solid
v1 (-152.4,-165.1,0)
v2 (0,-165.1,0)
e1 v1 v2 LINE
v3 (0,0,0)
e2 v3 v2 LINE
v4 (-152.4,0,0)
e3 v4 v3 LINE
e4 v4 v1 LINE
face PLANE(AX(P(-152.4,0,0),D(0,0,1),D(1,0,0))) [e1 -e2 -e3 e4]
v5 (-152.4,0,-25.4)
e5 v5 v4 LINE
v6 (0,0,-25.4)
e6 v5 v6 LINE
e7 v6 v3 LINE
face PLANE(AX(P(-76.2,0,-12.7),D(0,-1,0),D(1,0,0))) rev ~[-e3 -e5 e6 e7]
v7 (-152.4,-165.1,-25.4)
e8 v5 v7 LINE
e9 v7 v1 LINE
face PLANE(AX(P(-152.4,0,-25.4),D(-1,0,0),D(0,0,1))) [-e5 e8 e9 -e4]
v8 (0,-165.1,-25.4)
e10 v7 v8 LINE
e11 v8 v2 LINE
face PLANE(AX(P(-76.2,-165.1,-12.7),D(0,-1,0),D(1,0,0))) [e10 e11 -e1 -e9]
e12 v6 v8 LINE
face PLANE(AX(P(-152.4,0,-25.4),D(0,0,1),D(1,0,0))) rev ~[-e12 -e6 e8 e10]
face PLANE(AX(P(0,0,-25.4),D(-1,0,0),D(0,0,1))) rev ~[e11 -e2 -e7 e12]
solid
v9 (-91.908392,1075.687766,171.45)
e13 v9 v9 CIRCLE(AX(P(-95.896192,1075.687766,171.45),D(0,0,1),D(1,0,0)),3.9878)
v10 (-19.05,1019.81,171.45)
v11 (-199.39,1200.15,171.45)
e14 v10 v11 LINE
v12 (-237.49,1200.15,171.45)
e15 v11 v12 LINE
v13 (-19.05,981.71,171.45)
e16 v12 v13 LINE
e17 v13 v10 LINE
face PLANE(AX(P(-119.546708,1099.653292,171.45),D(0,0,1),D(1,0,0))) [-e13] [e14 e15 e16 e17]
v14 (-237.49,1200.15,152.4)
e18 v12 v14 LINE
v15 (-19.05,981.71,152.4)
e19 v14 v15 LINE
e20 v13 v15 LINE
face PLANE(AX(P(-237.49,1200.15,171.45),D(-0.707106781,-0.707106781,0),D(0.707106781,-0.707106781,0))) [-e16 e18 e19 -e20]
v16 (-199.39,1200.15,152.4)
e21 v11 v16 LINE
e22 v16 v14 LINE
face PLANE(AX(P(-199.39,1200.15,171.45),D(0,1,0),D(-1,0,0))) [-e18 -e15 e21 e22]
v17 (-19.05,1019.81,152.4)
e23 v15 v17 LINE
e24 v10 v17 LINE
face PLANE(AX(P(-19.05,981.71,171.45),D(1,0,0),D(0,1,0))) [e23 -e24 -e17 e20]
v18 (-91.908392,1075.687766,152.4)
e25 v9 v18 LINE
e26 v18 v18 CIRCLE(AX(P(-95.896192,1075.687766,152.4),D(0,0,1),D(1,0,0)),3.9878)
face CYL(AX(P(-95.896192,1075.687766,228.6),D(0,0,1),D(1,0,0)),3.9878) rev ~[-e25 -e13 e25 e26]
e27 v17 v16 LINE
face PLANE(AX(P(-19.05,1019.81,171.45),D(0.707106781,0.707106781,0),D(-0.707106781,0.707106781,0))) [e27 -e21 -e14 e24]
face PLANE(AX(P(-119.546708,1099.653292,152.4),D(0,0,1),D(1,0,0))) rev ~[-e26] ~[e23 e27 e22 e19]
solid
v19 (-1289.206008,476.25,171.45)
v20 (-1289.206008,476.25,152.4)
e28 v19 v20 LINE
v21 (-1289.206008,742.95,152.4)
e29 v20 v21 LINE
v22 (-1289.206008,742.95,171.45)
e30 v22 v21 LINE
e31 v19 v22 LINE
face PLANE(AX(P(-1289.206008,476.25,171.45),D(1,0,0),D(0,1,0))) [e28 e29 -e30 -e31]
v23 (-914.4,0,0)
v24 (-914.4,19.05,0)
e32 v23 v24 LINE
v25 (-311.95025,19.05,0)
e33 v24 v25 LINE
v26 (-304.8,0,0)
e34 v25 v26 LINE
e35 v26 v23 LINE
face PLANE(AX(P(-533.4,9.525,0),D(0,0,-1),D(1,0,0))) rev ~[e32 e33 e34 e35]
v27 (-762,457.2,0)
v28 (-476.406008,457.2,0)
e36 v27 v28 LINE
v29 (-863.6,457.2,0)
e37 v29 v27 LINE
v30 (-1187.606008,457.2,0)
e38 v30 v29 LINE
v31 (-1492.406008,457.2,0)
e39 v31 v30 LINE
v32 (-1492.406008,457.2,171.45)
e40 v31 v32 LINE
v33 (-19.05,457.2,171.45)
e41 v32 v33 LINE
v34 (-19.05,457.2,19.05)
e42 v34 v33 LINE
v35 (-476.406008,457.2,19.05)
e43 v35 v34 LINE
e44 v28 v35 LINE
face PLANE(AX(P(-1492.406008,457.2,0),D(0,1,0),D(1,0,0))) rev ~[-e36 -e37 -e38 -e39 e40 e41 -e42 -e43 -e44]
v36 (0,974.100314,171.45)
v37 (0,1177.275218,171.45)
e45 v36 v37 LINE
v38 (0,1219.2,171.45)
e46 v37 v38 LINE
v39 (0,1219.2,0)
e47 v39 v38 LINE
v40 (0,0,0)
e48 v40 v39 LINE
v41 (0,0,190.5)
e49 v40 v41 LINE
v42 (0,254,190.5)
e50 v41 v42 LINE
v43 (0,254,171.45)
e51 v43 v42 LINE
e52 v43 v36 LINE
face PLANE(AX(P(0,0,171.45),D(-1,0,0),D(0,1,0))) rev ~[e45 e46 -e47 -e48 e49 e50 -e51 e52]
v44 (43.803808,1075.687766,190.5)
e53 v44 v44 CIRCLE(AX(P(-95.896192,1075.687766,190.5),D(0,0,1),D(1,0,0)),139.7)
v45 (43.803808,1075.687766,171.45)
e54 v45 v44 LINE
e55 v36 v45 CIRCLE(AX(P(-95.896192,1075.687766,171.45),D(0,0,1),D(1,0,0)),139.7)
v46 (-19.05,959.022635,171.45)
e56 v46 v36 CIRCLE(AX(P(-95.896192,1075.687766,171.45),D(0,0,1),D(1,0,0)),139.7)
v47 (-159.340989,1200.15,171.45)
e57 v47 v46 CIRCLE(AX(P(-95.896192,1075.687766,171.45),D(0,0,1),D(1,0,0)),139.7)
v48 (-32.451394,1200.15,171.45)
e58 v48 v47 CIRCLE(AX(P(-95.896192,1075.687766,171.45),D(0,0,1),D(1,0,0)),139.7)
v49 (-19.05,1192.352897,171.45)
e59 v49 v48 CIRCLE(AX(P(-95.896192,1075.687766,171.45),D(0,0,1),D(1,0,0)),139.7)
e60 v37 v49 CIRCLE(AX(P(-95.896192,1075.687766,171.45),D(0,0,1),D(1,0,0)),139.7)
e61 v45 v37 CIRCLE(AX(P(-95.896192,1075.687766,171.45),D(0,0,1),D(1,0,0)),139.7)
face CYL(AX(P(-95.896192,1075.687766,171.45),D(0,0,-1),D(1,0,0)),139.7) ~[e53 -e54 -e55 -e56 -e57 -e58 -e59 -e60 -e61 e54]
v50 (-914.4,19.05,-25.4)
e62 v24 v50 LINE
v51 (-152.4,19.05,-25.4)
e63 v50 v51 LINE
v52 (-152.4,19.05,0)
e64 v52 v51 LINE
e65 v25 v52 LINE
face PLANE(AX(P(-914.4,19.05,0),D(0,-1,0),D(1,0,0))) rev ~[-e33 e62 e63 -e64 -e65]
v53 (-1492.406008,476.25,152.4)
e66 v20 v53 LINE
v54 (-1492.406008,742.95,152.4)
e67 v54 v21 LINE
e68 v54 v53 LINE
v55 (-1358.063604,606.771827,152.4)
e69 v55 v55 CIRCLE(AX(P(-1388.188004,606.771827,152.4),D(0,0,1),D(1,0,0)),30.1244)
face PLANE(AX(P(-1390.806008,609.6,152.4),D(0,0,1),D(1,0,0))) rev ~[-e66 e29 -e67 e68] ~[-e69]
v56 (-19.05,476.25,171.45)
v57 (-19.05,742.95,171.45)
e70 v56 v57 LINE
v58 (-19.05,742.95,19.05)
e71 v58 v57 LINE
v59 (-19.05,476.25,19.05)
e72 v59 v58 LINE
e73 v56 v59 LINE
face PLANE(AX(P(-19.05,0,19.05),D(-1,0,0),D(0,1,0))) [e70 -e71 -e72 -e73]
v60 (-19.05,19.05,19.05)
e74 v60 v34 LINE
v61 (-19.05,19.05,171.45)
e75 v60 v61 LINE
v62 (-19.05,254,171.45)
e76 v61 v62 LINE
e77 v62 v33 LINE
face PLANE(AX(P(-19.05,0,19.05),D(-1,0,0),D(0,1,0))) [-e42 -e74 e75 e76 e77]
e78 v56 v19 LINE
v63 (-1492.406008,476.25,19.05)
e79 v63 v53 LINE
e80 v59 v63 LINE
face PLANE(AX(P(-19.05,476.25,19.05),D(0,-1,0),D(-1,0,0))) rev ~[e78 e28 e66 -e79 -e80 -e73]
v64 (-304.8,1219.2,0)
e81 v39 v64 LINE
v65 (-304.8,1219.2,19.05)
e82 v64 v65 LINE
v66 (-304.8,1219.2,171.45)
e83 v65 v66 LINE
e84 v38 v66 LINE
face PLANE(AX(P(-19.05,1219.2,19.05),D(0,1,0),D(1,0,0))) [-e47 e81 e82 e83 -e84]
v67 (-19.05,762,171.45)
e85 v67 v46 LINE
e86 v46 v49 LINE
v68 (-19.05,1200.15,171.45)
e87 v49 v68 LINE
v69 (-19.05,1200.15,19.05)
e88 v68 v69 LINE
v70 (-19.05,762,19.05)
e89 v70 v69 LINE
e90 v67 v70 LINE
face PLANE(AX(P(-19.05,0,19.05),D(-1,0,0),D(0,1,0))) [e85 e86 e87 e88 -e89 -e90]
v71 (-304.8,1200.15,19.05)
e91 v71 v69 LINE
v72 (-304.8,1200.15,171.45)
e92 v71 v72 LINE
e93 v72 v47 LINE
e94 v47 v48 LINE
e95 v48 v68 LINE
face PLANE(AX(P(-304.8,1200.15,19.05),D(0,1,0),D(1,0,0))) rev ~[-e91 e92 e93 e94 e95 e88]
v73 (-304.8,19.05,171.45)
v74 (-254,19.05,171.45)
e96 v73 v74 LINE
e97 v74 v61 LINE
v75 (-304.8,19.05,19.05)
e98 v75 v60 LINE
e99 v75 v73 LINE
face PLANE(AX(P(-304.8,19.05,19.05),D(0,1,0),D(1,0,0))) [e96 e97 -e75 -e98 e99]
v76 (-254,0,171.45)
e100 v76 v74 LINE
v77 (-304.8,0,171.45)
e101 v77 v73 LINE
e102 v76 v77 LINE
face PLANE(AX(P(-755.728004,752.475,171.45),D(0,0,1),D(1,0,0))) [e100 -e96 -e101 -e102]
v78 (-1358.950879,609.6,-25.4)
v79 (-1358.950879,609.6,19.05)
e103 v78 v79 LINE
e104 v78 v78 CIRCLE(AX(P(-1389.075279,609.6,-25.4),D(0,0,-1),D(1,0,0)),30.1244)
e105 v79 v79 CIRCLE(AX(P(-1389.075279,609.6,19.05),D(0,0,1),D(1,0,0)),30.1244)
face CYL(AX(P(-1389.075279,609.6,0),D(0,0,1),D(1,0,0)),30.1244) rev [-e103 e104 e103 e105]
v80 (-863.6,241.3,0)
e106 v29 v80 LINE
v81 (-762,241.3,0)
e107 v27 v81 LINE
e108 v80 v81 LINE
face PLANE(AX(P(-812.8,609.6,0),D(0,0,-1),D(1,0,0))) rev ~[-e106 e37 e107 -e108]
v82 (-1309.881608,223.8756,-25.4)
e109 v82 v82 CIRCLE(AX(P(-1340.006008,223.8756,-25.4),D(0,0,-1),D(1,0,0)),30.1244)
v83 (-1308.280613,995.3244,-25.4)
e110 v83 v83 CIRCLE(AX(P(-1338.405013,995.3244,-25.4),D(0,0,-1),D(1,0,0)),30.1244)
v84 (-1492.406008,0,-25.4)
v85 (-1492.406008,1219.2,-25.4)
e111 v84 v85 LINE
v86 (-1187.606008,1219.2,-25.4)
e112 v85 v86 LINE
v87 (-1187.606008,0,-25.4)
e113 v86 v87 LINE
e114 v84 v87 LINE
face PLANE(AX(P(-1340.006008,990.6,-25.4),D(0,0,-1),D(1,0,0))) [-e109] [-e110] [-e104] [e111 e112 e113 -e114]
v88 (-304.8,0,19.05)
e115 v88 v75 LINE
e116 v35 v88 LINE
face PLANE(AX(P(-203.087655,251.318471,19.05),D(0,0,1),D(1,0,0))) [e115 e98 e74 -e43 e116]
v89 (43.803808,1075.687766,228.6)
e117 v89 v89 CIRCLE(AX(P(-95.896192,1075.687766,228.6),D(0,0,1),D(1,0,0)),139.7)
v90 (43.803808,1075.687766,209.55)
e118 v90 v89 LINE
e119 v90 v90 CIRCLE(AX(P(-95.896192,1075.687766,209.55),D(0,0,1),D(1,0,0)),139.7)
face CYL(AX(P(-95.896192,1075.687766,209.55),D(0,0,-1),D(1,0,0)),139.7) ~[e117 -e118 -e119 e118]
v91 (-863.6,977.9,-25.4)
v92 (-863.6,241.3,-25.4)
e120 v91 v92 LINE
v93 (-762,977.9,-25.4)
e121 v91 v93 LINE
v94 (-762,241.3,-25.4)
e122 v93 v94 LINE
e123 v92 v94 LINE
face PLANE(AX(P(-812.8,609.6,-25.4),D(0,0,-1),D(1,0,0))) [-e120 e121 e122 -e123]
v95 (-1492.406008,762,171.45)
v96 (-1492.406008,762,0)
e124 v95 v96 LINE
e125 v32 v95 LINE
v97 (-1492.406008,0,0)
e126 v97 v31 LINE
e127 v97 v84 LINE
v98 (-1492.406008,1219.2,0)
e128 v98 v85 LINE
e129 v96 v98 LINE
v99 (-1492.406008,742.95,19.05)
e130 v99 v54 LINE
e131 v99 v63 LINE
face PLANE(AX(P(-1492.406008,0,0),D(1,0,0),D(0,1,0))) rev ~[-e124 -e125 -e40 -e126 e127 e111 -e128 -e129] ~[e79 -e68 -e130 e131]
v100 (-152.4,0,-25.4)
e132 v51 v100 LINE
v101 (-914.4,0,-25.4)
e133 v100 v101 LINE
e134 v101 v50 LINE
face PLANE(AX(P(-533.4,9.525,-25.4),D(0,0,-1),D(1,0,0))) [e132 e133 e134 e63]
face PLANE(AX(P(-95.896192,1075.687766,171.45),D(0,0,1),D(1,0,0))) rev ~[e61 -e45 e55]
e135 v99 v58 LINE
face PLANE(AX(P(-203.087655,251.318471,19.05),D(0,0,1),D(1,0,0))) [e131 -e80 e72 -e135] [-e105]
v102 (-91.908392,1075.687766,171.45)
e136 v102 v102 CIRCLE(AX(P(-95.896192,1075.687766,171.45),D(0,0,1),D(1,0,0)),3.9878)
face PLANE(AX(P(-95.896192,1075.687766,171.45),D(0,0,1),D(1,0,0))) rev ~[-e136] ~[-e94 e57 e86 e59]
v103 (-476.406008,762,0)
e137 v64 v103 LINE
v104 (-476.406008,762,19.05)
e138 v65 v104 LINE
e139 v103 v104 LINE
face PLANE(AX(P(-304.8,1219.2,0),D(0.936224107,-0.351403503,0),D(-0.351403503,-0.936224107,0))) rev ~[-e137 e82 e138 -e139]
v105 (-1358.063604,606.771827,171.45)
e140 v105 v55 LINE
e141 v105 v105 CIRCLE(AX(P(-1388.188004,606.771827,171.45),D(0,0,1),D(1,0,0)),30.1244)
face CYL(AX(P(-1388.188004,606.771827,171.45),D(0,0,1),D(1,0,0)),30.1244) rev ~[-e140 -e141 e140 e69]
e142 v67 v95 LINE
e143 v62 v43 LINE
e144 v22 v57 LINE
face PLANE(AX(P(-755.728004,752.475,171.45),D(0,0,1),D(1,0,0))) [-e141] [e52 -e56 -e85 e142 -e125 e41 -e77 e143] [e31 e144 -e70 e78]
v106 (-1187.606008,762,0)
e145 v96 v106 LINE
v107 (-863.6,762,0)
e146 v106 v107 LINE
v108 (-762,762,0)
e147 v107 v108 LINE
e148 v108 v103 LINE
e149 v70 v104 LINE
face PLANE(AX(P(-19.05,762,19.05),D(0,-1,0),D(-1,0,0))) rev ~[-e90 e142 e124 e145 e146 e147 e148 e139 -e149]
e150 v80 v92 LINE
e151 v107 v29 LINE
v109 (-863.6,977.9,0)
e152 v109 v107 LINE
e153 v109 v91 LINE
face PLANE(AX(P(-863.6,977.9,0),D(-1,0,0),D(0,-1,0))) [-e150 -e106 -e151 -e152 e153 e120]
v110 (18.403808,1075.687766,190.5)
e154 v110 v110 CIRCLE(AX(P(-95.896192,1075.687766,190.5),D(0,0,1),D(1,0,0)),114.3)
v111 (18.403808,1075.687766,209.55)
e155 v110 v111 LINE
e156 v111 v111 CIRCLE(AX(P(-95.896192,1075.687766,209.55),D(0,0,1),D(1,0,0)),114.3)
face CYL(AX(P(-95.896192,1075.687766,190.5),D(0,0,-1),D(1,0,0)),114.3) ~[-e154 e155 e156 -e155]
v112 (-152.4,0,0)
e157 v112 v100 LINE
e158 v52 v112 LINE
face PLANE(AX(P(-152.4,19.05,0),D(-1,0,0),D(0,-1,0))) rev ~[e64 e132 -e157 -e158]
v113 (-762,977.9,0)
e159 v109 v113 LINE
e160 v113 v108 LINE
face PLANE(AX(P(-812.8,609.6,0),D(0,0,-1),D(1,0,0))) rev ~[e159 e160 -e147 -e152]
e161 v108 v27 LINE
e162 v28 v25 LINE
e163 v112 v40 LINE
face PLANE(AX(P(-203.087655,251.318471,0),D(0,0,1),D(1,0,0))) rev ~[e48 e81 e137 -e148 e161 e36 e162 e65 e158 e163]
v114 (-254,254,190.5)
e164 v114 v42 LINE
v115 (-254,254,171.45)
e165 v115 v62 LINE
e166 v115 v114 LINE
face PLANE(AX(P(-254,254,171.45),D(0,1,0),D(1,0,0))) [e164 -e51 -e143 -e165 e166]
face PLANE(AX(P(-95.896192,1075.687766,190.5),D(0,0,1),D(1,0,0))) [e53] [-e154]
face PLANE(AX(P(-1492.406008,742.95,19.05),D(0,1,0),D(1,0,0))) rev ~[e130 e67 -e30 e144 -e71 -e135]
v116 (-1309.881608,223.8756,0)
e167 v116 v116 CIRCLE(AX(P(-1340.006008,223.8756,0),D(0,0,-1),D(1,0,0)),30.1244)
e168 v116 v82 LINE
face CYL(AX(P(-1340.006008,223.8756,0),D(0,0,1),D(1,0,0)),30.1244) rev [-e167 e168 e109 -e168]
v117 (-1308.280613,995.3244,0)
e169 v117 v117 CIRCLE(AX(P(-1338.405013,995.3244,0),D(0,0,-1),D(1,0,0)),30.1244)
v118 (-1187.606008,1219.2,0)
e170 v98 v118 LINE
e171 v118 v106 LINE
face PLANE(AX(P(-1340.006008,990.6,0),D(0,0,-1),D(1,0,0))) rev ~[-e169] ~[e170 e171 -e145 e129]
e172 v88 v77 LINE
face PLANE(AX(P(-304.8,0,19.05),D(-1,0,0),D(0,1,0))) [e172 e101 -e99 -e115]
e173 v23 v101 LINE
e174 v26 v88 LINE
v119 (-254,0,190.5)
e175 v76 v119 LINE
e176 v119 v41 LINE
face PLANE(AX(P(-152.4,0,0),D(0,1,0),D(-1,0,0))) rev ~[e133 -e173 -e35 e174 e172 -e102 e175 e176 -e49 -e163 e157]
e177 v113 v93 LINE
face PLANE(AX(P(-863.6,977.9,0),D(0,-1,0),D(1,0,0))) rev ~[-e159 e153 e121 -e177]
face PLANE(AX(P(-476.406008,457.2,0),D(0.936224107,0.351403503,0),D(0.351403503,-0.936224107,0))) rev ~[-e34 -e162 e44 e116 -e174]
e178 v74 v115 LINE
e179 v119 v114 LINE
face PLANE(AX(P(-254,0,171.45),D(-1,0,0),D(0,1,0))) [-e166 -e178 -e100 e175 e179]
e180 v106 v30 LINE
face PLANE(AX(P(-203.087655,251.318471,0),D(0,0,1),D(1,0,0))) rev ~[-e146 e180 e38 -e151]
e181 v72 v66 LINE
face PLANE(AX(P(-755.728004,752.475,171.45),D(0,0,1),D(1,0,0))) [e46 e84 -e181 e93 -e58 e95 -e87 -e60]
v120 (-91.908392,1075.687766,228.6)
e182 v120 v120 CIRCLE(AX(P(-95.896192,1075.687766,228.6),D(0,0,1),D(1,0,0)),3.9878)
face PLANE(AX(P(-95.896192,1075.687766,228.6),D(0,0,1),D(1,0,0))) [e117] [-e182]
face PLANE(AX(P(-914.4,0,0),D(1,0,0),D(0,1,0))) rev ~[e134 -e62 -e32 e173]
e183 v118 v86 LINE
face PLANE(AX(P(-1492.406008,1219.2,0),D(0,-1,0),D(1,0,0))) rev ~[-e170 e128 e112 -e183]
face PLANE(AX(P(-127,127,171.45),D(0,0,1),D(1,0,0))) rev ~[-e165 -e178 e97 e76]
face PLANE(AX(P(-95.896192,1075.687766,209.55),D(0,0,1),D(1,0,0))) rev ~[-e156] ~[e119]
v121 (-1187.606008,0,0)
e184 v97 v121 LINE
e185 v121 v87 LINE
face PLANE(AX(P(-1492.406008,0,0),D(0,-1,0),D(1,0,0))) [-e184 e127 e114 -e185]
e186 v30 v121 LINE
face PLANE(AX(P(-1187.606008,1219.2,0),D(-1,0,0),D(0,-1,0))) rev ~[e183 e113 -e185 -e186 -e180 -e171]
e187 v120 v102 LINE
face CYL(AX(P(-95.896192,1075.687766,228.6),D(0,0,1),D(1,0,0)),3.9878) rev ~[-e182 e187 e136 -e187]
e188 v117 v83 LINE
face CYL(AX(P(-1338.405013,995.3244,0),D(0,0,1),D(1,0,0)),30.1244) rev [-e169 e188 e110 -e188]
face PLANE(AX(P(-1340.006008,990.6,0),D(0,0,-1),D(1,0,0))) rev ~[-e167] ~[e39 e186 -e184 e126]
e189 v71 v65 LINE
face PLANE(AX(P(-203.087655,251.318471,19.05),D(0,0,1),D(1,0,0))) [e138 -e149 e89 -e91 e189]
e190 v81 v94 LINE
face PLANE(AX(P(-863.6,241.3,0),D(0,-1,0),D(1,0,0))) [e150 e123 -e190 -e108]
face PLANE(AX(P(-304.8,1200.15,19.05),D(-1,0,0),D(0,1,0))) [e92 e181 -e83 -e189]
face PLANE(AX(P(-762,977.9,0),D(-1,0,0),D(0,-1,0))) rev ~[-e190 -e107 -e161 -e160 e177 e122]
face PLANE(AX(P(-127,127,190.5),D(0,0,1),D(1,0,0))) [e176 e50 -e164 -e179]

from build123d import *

# Parameters (mm, degrees)
F0_W      = 476.4060080051
F0_H      = 19.05
F0_H_2    = 266.7
F0_W_2    = 1016
F0_R      = 30.1244
F1_DEPTH  = 19.05
F2_W      = 19.05
F2_H      = 1219.2
F3_DEPTH  = 152.4
F4_W      = 285.75
F4_H      = 19.05
F5_DEPTH  = 152.4
F7_DEPTH  = 152.4
F8_W      = 203.2
F8_H      = 266.7
F8_R      = 30.1244
F9_DEPTH  = 19.05
F11_DEPTH = 19.05
F12_R     = 139.7
F13_DEPTH = 19.05
F14_R     = 114.3
F15_DEPTH = 19.05
F16_R     = 139.7
F17_DEPTH = 19.05
F18_W     = 101.6
F18_H     = 736.6
F20_DEPTH = 25.4
F21_R     = 3.9878
F22_DEPTH = 96.52
F23_W     = 304.8
F23_H     = 457.2
F23_R     = 30.1244
F23_H_2   = 304.8
F24_DEPTH = 25.4
F25_W     = 254
F25_H     = 254
F26_DEPTH = 19.05
F28_DEPTH = 25.4
F29_W     = 152.4
F29_H     = 25.4
F30_DEPTH = 165.1


# Not quite as in the source:
# - a feature of the source that left no trace in its solid (it failed there, or was rolled back) is left out


with BuildPart() as f1:
    # F0 (on Top) → F1 (new body)
    with BuildSketch(Plane.XY):
        Polygon((-304.8, 0), (0, 0), (0, 457.2), (-476.4060080051, 457.2), align=None)
        with Locations((-238.2030040026, 466.725)):
            Rectangle(F0_W, F0_H)
        with Locations((-238.2030040026, 609.6)):
            Rectangle(F0_W, F0_H_2)
        with Locations((-984.4060080051, 466.725)):
            Rectangle(F0_W_2, F0_H)
        Polygon((-476.4060080051, 742.95), (0, 742.95), (0, 762), (0, 1219.2), (-304.8, 1219.2), (-476.4060080051, 762), align=None)
        with Locations((-984.4060080051, 609.6)):
            Rectangle(F0_W_2, F0_H_2)
        with Locations((-1389.0752792358, 609.6)):
            Circle(F0_R, mode=Mode.SUBTRACT)
        with Locations((-984.4060080051, 752.475)):
            Rectangle(F0_W_2, F0_H)
    extrude(amount=F1_DEPTH)

    # F2 (on face) → F3 (join)
    with BuildSketch(Plane.XY.offset(19.05)):
        with Locations((-9.525, 609.6)):
            Rectangle(F2_W, F2_H)
    extrude(amount=F3_DEPTH)

    # F4 (on face) → F5 (join)
    with BuildSketch(Plane.XY.offset(19.05)):
        with Locations((-161.925, 9.525)):
            Rectangle(F4_W, F4_H)
        with Locations((-161.925, 1209.675)):
            Rectangle(F4_W, F4_H)
    extrude(amount=F5_DEPTH)

    # F6 (on face) → F7 (join)
    with BuildSketch(Plane.XY.offset(19.05)):
        Polygon((-476.4060080051, 762), (-1492.4060080051, 762), (-1492.4060080051, 742.95), (-19.05, 742.95), (-19.05, 762), align=None)
        Polygon((-19.05, 476.25), (-1492.4060080051, 476.25), (-1492.4060080051, 457.2), (-476.4060080051, 457.2), (-19.05, 457.2), align=None)
    extrude(amount=F7_DEPTH)

    # F8 (on face) → F9 (join)
    with BuildSketch(Plane.XY.offset(171.45)):
        with Locations((-1390.8060080051, 609.6)):
            Rectangle(F8_W, F8_H)
        with Locations((-1388.1880044937, 606.7718267441)):
            Circle(F8_R, mode=Mode.SUBTRACT)
        Polygon((-1492.4060080051, 762), (-1492.4060080051, 742.95), (-1289.2060080051, 742.95), (-19.05, 742.95), (-19.05, 476.25), (-1289.2060080051, 476.25), (-1492.4060080051, 476.25), (-1492.4060080051, 457.2), (-19.05, 457.2), (-19.05, 19.05), (-304.8, 19.05), (-304.8, 0), (0, 0), (0, 1219.2), (-304.8, 1219.2), (-304.8, 1200.15), (-19.05, 1200.15), (-19.05, 762), align=None)
    extrude(amount=-F9_DEPTH)

    # F12 (on face) → F13 (join)
    with BuildSketch(Plane.XY.offset(171.45)):
        with Locations((-95.896191895, 1075.6877660751)):
            Circle(F12_R)
    extrude(amount=F13_DEPTH)

    # F14 (on face) → F15 (join)
    with BuildSketch(Plane.XY.offset(190.5)):
        with Locations((-95.896191895, 1075.6877660751)):
            Circle(F14_R)
    extrude(amount=F15_DEPTH)

    # F16 (on face) → F17 (join)
    with BuildSketch(Plane.XY.offset(209.55)):
        with Locations((-95.896191895, 1075.6877660751)):
            Circle(F16_R)
    extrude(amount=F17_DEPTH)

    # F18 (on face) → F20 (join)
    with BuildSketch(Plane(origin=(0, 0, 0), x_dir=(1, 0, 0), z_dir=(0, 0, -1))):
        with Locations((-812.8, -609.6)):
            Rectangle(F18_W, F18_H)
    extrude(amount=F20_DEPTH)


with BuildPart() as f11:
    # F10 (on face) → F11 (new body)
    with BuildSketch(Plane.XY.offset(171.45)):
        Polygon((-19.05, 981.71), (-19.05, 1019.81), (-199.39, 1200.15), (-237.49, 1200.15), align=None)
    extrude(amount=-F11_DEPTH)


with BuildPart() as f22_tool:
    # F21 (on face) → F22 (new body)
    with BuildSketch(Plane.XY.offset(228.6)):
        with Locations((-95.896191895, 1075.6877660751)):
            Circle(F21_R)
    extrude(amount=-F22_DEPTH)


with BuildPart() as f1_1:
    add(f1.part)

    # F22: cut by f22_tool
    add(f22_tool.part, mode=Mode.SUBTRACT)

    # F23 (on face) → F24 (join)
    with BuildSketch(Plane(origin=(0, 0, 0), x_dir=(1, 0, 0), z_dir=(0, 0, -1))):
        with Locations((-1340.0060080051, -990.6)):
            Rectangle(F23_W, F23_H)
        with Locations((-1338.4050130844, -995.3244)):
            Circle(F23_R, mode=Mode.SUBTRACT)
        with Locations((-1340.0060080051, -609.6)):
            Rectangle(F23_W, F23_H_2)
        with Locations((-1389.0752792358, -609.6)):
            Circle(F23_R, mode=Mode.SUBTRACT)
        with Locations((-1340.0060080051, -228.6)):
            Rectangle(F23_W, F23_H)
        with Locations((-1340.0060080051, -223.8756)):
            Circle(F23_R, mode=Mode.SUBTRACT)
    extrude(amount=F24_DEPTH)

    # F25 (on face) → F26 (join)
    with BuildSketch(Plane.XY.offset(171.45)):
        with Locations((-127, 127)):
            Rectangle(F25_W, F25_H)
    extrude(amount=F26_DEPTH)

    # F27 (on face) → F28 (join)
    with BuildSketch(Plane(origin=(0, 0, 0), x_dir=(1, 0, 0), z_dir=(0, 0, -1))):
        Polygon((-152.4, 0), (-304.8, 0), (-914.4, 0), (-914.4, -19.05), (-152.4, -19.05), align=None)
    extrude(amount=F28_DEPTH)


with BuildPart() as f11_1:
    add(f11.part)

    # F22: cut by f22_tool
    add(f22_tool.part, mode=Mode.SUBTRACT)


with BuildPart() as f30:
    # F29 (on face) → F30 (new body)
    with BuildSketch(Plane.XZ):
        with Locations((-76.2, -12.7)):
            Rectangle(F29_W, F29_H)
    extrude(amount=F30_DEPTH)


solid = Compound([f1_1.part, f11_1.part, f30.part])
